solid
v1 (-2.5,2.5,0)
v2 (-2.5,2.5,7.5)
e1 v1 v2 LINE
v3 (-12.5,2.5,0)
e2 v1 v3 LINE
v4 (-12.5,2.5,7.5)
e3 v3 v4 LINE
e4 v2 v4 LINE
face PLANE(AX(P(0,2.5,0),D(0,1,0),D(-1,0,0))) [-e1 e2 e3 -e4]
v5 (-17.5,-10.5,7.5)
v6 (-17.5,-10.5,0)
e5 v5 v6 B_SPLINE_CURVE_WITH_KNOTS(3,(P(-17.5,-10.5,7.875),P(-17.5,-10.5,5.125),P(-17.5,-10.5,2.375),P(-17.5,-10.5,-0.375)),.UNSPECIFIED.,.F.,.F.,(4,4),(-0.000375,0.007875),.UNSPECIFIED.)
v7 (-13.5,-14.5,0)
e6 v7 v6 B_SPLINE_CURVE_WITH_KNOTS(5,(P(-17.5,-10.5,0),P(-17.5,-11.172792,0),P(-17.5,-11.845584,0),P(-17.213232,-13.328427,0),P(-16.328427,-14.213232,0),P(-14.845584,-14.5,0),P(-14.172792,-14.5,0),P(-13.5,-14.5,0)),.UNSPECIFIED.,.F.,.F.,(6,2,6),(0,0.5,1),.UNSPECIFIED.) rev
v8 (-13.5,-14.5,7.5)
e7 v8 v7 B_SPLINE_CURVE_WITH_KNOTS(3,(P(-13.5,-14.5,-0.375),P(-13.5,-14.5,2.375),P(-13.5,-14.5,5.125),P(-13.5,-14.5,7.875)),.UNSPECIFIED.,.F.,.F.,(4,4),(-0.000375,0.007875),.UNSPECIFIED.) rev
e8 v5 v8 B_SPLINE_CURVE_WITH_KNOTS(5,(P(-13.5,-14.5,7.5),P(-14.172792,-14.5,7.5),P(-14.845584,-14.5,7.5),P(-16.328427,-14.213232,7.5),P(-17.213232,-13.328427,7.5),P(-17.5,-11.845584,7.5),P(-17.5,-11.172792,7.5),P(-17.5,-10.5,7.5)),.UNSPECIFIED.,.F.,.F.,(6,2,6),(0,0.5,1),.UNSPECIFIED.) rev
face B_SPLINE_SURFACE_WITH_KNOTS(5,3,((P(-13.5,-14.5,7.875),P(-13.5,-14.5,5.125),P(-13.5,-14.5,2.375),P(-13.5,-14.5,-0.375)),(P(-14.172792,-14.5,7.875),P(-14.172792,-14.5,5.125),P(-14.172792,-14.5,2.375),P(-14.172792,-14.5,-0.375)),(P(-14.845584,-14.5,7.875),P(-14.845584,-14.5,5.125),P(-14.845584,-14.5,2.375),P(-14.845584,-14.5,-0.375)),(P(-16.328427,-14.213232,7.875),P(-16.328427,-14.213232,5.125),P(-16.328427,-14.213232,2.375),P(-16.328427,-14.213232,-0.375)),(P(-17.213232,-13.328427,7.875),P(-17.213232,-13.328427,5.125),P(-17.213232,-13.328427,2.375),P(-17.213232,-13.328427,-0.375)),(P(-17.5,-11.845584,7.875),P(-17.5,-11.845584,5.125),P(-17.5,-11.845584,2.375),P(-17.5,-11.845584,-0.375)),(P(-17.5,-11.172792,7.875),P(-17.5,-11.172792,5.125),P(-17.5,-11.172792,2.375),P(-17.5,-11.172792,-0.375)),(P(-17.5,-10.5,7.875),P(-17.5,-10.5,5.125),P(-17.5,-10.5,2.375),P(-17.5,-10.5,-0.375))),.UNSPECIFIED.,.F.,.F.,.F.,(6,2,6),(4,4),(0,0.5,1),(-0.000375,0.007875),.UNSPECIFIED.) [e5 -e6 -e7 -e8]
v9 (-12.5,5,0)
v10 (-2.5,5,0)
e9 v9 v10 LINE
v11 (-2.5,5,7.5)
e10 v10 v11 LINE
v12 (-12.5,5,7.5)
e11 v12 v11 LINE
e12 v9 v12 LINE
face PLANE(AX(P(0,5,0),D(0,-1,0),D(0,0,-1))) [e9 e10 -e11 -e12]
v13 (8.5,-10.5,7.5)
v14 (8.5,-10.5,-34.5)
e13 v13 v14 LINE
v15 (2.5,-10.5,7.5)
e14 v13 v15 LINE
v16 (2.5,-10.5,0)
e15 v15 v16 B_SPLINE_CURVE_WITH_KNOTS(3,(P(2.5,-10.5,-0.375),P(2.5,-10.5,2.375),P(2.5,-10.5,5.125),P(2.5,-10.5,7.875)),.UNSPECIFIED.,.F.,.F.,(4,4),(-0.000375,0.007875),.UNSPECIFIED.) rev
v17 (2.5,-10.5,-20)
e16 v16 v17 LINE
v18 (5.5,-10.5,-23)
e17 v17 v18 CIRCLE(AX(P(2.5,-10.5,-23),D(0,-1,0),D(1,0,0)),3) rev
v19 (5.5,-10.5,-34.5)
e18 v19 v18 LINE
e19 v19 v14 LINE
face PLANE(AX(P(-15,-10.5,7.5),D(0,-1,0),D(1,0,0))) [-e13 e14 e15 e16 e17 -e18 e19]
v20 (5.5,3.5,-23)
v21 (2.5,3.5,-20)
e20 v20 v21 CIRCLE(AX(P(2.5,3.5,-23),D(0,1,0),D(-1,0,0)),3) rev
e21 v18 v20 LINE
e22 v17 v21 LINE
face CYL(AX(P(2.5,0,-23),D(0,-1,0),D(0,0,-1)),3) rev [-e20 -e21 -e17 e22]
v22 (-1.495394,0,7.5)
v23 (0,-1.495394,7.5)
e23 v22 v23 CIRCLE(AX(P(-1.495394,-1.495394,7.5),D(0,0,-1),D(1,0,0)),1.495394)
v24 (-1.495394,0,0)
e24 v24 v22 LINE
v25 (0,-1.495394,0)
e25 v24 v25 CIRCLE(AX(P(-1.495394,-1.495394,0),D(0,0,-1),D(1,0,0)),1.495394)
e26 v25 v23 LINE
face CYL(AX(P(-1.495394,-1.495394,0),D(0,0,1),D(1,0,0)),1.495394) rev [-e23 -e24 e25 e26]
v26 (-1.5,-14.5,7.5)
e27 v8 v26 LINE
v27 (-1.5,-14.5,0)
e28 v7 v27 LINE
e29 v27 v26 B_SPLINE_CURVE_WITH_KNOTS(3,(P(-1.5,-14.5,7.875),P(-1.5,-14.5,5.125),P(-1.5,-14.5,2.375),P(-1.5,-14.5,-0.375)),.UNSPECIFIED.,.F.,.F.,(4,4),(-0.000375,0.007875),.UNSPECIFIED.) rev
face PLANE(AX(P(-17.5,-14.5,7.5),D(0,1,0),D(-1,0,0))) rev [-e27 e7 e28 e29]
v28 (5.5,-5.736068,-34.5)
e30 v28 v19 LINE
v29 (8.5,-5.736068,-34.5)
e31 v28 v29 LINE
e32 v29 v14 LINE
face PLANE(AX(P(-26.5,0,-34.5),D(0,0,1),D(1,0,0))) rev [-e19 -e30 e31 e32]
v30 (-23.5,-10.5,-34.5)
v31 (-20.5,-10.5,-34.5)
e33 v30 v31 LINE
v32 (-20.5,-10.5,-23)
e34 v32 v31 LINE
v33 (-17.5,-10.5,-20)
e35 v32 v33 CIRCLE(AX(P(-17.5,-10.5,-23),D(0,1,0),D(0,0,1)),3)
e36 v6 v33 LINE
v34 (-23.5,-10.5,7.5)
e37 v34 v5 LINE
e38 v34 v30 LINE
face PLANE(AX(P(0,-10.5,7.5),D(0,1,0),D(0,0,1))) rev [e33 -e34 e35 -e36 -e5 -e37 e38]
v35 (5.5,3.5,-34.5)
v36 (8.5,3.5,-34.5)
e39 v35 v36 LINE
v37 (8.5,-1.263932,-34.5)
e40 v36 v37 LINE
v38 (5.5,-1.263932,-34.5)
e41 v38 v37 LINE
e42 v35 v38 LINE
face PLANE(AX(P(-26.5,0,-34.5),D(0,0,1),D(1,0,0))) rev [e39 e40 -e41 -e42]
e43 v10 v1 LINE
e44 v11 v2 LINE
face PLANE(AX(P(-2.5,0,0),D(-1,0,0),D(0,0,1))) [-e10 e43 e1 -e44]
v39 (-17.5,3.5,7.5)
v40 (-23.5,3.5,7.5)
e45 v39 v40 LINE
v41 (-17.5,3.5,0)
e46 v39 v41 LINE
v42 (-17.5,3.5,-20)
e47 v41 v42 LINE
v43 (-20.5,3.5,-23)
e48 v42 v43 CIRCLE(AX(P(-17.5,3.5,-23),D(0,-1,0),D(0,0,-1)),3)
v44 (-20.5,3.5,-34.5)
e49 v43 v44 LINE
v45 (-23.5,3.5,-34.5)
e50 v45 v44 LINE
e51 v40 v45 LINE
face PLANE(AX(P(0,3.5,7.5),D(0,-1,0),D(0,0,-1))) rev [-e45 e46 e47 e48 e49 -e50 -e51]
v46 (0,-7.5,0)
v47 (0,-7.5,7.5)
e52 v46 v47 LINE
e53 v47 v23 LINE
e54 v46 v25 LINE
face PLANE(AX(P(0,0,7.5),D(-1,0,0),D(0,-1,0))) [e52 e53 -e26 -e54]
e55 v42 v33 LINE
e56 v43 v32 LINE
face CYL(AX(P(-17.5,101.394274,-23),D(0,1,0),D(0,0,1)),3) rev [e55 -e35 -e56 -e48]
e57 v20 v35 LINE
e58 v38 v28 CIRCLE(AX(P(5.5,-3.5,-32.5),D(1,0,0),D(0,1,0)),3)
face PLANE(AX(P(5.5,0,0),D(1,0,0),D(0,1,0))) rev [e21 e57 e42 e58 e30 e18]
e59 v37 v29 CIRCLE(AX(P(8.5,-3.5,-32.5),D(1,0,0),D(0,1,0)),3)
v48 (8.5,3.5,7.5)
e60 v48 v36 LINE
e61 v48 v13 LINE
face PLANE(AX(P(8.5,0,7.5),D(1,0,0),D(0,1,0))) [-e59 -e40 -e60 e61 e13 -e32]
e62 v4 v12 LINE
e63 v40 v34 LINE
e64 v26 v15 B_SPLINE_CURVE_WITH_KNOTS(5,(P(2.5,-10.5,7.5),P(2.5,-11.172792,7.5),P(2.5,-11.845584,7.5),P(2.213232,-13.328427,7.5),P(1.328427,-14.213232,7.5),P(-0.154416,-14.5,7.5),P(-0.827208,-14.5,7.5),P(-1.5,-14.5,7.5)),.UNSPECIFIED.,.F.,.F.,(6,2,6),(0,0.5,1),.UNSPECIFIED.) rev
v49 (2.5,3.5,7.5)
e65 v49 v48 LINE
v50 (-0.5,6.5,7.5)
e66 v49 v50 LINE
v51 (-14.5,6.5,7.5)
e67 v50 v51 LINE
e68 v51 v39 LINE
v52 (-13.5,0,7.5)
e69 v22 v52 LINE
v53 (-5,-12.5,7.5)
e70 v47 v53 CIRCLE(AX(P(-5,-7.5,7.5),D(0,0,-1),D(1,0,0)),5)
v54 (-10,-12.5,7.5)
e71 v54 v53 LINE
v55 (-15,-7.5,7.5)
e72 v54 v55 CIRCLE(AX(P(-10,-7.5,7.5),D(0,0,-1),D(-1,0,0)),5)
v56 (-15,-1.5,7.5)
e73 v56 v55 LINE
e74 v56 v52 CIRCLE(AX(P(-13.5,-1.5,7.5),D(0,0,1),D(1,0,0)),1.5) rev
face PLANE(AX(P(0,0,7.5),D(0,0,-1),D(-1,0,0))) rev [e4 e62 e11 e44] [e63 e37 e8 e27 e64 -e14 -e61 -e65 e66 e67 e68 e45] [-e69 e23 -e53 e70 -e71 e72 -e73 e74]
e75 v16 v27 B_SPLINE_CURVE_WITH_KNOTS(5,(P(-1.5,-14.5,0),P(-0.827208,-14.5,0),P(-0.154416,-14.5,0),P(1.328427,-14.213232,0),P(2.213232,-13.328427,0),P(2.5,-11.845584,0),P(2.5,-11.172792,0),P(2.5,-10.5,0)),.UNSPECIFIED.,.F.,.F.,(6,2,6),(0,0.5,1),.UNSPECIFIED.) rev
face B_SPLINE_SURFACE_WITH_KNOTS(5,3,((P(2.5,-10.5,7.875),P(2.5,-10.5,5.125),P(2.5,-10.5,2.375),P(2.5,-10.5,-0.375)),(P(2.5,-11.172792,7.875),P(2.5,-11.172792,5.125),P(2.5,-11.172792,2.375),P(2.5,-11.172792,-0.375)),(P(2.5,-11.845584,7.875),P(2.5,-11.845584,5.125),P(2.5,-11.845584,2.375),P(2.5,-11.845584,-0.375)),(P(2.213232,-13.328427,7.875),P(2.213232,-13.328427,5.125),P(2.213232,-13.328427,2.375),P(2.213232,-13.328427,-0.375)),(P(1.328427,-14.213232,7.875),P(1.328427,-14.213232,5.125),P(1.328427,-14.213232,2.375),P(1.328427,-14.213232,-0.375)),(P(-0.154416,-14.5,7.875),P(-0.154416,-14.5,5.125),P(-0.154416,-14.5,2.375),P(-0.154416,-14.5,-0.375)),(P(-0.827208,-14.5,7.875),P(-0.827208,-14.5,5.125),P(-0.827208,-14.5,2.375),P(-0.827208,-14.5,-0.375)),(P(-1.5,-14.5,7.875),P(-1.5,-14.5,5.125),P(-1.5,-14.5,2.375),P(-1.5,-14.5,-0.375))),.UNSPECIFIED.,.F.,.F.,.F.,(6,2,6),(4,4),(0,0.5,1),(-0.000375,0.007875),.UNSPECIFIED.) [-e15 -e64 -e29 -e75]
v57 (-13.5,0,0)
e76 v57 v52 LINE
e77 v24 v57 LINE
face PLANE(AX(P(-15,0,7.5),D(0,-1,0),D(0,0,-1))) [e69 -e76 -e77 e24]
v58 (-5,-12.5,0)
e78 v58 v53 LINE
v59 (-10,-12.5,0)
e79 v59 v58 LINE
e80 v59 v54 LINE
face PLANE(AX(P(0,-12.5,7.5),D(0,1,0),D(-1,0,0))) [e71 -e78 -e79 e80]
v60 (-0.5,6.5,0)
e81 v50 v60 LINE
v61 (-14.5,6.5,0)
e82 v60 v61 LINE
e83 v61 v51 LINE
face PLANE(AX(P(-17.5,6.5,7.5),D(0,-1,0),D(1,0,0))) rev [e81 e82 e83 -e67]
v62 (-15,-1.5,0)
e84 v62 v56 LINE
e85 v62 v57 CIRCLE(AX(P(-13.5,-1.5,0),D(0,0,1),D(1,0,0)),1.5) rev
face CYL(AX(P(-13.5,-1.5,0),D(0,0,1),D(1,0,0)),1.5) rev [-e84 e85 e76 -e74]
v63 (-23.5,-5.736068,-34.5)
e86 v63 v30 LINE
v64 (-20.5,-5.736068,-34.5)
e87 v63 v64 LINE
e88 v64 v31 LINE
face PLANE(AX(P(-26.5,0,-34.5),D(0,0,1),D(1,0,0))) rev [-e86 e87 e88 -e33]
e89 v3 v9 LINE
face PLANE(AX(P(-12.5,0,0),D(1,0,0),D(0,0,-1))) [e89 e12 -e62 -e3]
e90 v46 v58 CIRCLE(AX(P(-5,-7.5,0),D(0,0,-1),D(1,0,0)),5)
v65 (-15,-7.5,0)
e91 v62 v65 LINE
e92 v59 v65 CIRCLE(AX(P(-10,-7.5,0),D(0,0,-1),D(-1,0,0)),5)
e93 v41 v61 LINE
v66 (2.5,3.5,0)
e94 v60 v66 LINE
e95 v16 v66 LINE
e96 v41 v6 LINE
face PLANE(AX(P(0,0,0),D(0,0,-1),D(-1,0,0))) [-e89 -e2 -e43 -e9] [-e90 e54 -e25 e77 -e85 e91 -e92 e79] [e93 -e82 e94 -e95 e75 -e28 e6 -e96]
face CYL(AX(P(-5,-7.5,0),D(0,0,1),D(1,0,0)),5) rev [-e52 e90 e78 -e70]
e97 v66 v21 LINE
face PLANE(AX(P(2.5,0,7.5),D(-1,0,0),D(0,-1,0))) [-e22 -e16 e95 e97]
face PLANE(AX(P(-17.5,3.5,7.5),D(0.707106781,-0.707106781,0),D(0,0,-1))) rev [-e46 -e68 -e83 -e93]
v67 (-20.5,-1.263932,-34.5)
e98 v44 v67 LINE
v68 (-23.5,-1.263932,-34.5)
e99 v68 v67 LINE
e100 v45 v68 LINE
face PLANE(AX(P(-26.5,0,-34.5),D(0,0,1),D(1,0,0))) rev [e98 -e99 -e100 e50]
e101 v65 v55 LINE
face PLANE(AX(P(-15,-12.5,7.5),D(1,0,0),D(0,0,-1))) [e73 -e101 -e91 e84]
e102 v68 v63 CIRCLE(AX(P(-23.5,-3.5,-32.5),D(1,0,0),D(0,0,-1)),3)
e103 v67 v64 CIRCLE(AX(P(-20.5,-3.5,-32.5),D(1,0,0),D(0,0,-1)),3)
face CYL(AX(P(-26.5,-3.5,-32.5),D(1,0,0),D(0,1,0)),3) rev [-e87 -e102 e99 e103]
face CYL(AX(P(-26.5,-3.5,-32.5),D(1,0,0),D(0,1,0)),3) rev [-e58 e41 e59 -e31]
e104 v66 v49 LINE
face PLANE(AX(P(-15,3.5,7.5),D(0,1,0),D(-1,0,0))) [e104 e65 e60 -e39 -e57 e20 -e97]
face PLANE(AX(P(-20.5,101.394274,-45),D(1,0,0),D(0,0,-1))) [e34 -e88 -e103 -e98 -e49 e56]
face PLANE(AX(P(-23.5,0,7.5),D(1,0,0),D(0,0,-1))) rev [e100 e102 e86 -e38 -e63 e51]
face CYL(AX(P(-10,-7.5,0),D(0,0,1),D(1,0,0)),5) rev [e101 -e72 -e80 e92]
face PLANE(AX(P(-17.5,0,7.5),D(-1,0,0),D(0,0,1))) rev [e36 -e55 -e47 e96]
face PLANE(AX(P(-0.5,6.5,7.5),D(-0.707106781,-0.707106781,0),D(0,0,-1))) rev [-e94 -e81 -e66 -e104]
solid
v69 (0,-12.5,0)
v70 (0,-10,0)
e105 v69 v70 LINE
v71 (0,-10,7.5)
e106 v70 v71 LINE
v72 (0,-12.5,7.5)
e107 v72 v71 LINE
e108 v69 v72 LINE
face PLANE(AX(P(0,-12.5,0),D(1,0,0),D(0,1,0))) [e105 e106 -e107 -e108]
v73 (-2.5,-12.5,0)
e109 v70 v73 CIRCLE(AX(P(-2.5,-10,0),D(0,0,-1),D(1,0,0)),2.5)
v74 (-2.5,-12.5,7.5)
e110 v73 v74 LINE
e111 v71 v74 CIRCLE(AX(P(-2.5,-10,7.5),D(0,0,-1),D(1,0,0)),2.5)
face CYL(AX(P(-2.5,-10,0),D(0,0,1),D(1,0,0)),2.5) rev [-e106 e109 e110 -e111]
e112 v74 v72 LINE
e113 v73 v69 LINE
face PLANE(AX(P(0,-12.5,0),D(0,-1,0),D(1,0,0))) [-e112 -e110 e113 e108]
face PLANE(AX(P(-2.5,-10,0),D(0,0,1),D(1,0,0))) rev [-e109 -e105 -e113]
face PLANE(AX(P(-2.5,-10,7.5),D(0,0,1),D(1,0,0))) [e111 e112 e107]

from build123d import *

# Parameters (mm, degrees)
SKETCH1_W               = 20
SKETCH1_H               = 21
SKETCH1_W_2             = 15
SKETCH1_H_2             = 12.5
BOSS_EXTRUDE1_DEPTH     = 7.5
FILLET1_SIZE            = 4
BOSS_EXTRUDE2_DEPTH     = 7.5
BOSS_EXTRUDE3_DEPTH     = 7.5
BOSS_EXTRUDE4_DEPTH     = 7.5
BOSS_EXTRUDE5_DEPTH     = 7.5
CHAMFER1_SIZE           = 3
SKETCH8_W               = 10
SKETCH8_H               = 2.5
CUT_EXTRUDE1_DEPTH      = 7.5
BOSS_EXTRUDE10_START    = -7.5
SKETCH19_W              = 6
SKETCH19_H              = 14
BOSS_EXTRUDE10_DEPTH    = 52.5
CUT_EXTRUDE5_DEPTH      = 54.863252857
CUT_EXTRUDE5_DEPTH_BACK = 15
FILLET2_R               = 3
CUT_EXTRUDE16_DEPTH     = 3
FILLET3_R               = 3
CUT_EXTRUDE17_DEPTH     = 35


# Some blends are built 0.0001 mm under size
with BuildPart() as part:
    # Sketch1 → Boss-Extrude1 (new body)
    with BuildSketch(Plane.XY):
        with Locations((-7.5, -4)):
            Rectangle(SKETCH1_W, SKETCH1_H)
        with Locations((-7.5, -6.25)):
            Rectangle(SKETCH1_W_2, SKETCH1_H_2, mode=Mode.SUBTRACT)
    extrude(amount=BOSS_EXTRUDE1_DEPTH)

    # Fillet1
    # a fillet whose section is not a circle: 4 mm, written as the material it takes off along each edge
    with BuildSketch(Plane(origin=(-17.5, -14.5, -10), x_dir=(0, 1, 0), z_dir=(0, 0, 1)), Plane(origin=(2.5, -14.5, -10), x_dir=(-1, 0, 0), z_dir=(0, 0, 1))) as fillet1_piece_1:
        with BuildLine():
            add(Edge.make_bspline([(FILLET1_SIZE, 0), (FILLET1_SIZE * 0.831801948466, 0), (FILLET1_SIZE * 0.663603896932, 0), (FILLET1_SIZE * 0.292893218813, -FILLET1_SIZE * 0.0716919198361), (FILLET1_SIZE * 0.0716919198361, -FILLET1_SIZE * 0.292893218813), (0, -FILLET1_SIZE * 0.663603896932), (0, -FILLET1_SIZE * 0.831801948466), (0, -FILLET1_SIZE)], knots=[0, 0, 0, 0, 0, 0, 0.5, 0.5, 1, 1, 1, 1, 1, 1], degree=5))
            Line((0, -FILLET1_SIZE), (0, 0))
            Line((0, 0), (FILLET1_SIZE, 0))
        make_face()
    extrude(amount=27.5, mode=Mode.SUBTRACT)

    # Sketch3 → Boss-Extrude2 (add)
    with BuildSketch(Plane.XY.offset(7.5)):
        with BuildLine():
            Line((-13.5, 0), (-15, 0))
            Line((-15, 0), (-15, -1.5))
            ThreePointArc((-15, -1.5), (-14.560660172, -0.439339828), (-13.5, 0))
        make_face()
    extrude(amount=-BOSS_EXTRUDE2_DEPTH)

    # Sketch4 → Boss-Extrude3 (add)
    with BuildSketch(Plane.XY.offset(7.5)):
        with BuildLine():
            Line((0, 0), (0, -1.495394009))
            ThreePointArc((0, -1.495394009), (-0.437990765, -0.437990765), (-1.495394009, 0))
            Line((-1.495394009, 0), (0, 0))
        make_face()
    extrude(amount=-BOSS_EXTRUDE3_DEPTH)

    # Sketch7 → Boss-Extrude5 (add)
    with BuildSketch(Plane.XY.offset(7.5)):
        with BuildLine():
            Line((-15, -12.5), (-10, -12.5))
            ThreePointArc((-10, -12.5), (-13.535533906, -11.035533906), (-15, -7.5))
            Line((-15, -7.5), (-15, -12.5))
        make_face()
        with BuildLine():
            Line((0, -12.5), (-5, -12.5))
            ThreePointArc((-5, -12.5), (-1.464466094, -11.035533906), (0, -7.5))
            Line((0, -7.5), (0, -12.5))
        make_face()
    extrude(amount=-BOSS_EXTRUDE5_DEPTH)

    # Chamfer1
    chamfer1_edges = [part.edges().sort_by_distance(p)[0] for p in [
        (2.5, 6.5, 3.75),
        (-17.5, 6.5, 3.75),
    ]]
    chamfer(chamfer1_edges, length=CHAMFER1_SIZE)

    # Sketch8 → Cut-Extrude1 (cut)
    with BuildSketch(Plane.XY.offset(7.5)):
        with Locations((-7.5, 3.75)):
            Rectangle(SKETCH8_W, SKETCH8_H)
    extrude(amount=-CUT_EXTRUDE1_DEPTH, mode=Mode.SUBTRACT)

    # Sketch19 → Boss-Extrude10 (add)
    with BuildSketch(Plane(origin=(0, 0, 0), x_dir=(-1, 0, 0), z_dir=(0, 0, -1)).offset(BOSS_EXTRUDE10_START)):
        with Locations((20.5, -3.5)):
            Rectangle(SKETCH19_W, SKETCH19_H)
    boss_extrude10 = extrude(amount=BOSS_EXTRUDE10_DEPTH)

    # Sketch24 → Cut-Extrude5 (cut, two sides: drawn at the far end of the back side and taken through both)
    with BuildSketch(Plane(origin=(0, 3.5, 0), x_dir=(1, 0, 0), z_dir=(0, 1, 0)).offset(-CUT_EXTRUDE5_DEPTH_BACK)):
        Polygon((-20.5, 169.634201094), (-20.5, 45), (-20.5, 20), (-17.5, 20), (107.134201094, 20), (296.782917214, 181.765573603), (169.14871612, 331.399774696), align=None)
    extrude(amount=CUT_EXTRUDE5_DEPTH + CUT_EXTRUDE5_DEPTH_BACK, mode=Mode.SUBTRACT)

    # Fillet2
    fillet2_edges = [part.edges().sort_by_distance(p)[0] for p in [
        (-20.5, -3.5, -20),
    ]]
    fillet(fillet2_edges, radius=FILLET2_R - 0.0001)  # a hair under: the kernel refuses the full size

    # Mirror4: Boss-Extrude10 across plane
    add(boss_extrude10.mirror(Plane.ZY.offset(7.5)))

    # Sketch32 → Cut-Extrude16 (cut)
    with BuildSketch(Plane.ZY.offset(-2.5)):
        Polygon((-20, 3.5), (-20, -10.5), (-44.524944587, -10.5), (-45, -10.5), (-45, 3.5), (-20.308747934, 3.5), align=None)
    extrude(amount=-CUT_EXTRUDE16_DEPTH, mode=Mode.SUBTRACT)

    # Fillet3
    fillet3_edges = [part.edges().sort_by_distance(p)[0] for p in [
        (5.5, -3.5, -20),
    ]]
    fillet(fillet3_edges, radius=FILLET3_R - 0.0001)  # a hair under: the kernel refuses the full size

    # Sketch33 → Cut-Extrude17 (cut)
    with BuildSketch(Plane(origin=(8.5, 0, 0), x_dir=(0, 0, -1), z_dir=(1, 0, 0))):
        with BuildLine():
            ThreePointArc((35.5, -3.5), (35.238612788, -2.275255129), (34.5, -1.263932023))
            Line((34.5, -1.263932023), (34.5, -5.736067977))
            ThreePointArc((34.5, -5.736067977), (35.238612788, -4.724744871), (35.5, -3.5))
        make_face()
        with BuildLine():
            Line((34.5, -5.736067977), (34.5, -1.263932023))
            ThreePointArc((34.5, -1.263932023), (29.5, -3.5), (34.5, -5.736067977))
        make_face()
        with BuildLine():
            Line((45, -10.5), (45, 3.5))
            Line((45, 3.5), (34.5, 3.5))
            Line((34.5, 3.5), (34.5, -1.263932023))
            ThreePointArc((34.5, -1.263932023), (35.238612788, -2.275255129), (35.5, -3.5))
            ThreePointArc((35.5, -3.5), (35.238612788, -4.724744871), (34.5, -5.736067977))
            Line((34.5, -5.736067977), (34.5, -10.5))
            Line((34.5, -10.5), (45, -10.5))
        make_face()
    extrude(amount=-CUT_EXTRUDE17_DEPTH, mode=Mode.SUBTRACT)


with BuildPart() as body_2:
    # Sketch6 → Boss-Extrude4 (new body)
    with BuildSketch(Plane.XY.offset(7.5)):
        with BuildLine():
            Line((0, -12.5), (0, -10))
            ThreePointArc((0, -10), (-0.732233047, -11.767766953), (-2.5, -12.5))
            Line((-2.5, -12.5), (0, -12.5))
        make_face()
    extrude(amount=-BOSS_EXTRUDE4_DEPTH)


solid = Compound([part.part, body_2.part])
